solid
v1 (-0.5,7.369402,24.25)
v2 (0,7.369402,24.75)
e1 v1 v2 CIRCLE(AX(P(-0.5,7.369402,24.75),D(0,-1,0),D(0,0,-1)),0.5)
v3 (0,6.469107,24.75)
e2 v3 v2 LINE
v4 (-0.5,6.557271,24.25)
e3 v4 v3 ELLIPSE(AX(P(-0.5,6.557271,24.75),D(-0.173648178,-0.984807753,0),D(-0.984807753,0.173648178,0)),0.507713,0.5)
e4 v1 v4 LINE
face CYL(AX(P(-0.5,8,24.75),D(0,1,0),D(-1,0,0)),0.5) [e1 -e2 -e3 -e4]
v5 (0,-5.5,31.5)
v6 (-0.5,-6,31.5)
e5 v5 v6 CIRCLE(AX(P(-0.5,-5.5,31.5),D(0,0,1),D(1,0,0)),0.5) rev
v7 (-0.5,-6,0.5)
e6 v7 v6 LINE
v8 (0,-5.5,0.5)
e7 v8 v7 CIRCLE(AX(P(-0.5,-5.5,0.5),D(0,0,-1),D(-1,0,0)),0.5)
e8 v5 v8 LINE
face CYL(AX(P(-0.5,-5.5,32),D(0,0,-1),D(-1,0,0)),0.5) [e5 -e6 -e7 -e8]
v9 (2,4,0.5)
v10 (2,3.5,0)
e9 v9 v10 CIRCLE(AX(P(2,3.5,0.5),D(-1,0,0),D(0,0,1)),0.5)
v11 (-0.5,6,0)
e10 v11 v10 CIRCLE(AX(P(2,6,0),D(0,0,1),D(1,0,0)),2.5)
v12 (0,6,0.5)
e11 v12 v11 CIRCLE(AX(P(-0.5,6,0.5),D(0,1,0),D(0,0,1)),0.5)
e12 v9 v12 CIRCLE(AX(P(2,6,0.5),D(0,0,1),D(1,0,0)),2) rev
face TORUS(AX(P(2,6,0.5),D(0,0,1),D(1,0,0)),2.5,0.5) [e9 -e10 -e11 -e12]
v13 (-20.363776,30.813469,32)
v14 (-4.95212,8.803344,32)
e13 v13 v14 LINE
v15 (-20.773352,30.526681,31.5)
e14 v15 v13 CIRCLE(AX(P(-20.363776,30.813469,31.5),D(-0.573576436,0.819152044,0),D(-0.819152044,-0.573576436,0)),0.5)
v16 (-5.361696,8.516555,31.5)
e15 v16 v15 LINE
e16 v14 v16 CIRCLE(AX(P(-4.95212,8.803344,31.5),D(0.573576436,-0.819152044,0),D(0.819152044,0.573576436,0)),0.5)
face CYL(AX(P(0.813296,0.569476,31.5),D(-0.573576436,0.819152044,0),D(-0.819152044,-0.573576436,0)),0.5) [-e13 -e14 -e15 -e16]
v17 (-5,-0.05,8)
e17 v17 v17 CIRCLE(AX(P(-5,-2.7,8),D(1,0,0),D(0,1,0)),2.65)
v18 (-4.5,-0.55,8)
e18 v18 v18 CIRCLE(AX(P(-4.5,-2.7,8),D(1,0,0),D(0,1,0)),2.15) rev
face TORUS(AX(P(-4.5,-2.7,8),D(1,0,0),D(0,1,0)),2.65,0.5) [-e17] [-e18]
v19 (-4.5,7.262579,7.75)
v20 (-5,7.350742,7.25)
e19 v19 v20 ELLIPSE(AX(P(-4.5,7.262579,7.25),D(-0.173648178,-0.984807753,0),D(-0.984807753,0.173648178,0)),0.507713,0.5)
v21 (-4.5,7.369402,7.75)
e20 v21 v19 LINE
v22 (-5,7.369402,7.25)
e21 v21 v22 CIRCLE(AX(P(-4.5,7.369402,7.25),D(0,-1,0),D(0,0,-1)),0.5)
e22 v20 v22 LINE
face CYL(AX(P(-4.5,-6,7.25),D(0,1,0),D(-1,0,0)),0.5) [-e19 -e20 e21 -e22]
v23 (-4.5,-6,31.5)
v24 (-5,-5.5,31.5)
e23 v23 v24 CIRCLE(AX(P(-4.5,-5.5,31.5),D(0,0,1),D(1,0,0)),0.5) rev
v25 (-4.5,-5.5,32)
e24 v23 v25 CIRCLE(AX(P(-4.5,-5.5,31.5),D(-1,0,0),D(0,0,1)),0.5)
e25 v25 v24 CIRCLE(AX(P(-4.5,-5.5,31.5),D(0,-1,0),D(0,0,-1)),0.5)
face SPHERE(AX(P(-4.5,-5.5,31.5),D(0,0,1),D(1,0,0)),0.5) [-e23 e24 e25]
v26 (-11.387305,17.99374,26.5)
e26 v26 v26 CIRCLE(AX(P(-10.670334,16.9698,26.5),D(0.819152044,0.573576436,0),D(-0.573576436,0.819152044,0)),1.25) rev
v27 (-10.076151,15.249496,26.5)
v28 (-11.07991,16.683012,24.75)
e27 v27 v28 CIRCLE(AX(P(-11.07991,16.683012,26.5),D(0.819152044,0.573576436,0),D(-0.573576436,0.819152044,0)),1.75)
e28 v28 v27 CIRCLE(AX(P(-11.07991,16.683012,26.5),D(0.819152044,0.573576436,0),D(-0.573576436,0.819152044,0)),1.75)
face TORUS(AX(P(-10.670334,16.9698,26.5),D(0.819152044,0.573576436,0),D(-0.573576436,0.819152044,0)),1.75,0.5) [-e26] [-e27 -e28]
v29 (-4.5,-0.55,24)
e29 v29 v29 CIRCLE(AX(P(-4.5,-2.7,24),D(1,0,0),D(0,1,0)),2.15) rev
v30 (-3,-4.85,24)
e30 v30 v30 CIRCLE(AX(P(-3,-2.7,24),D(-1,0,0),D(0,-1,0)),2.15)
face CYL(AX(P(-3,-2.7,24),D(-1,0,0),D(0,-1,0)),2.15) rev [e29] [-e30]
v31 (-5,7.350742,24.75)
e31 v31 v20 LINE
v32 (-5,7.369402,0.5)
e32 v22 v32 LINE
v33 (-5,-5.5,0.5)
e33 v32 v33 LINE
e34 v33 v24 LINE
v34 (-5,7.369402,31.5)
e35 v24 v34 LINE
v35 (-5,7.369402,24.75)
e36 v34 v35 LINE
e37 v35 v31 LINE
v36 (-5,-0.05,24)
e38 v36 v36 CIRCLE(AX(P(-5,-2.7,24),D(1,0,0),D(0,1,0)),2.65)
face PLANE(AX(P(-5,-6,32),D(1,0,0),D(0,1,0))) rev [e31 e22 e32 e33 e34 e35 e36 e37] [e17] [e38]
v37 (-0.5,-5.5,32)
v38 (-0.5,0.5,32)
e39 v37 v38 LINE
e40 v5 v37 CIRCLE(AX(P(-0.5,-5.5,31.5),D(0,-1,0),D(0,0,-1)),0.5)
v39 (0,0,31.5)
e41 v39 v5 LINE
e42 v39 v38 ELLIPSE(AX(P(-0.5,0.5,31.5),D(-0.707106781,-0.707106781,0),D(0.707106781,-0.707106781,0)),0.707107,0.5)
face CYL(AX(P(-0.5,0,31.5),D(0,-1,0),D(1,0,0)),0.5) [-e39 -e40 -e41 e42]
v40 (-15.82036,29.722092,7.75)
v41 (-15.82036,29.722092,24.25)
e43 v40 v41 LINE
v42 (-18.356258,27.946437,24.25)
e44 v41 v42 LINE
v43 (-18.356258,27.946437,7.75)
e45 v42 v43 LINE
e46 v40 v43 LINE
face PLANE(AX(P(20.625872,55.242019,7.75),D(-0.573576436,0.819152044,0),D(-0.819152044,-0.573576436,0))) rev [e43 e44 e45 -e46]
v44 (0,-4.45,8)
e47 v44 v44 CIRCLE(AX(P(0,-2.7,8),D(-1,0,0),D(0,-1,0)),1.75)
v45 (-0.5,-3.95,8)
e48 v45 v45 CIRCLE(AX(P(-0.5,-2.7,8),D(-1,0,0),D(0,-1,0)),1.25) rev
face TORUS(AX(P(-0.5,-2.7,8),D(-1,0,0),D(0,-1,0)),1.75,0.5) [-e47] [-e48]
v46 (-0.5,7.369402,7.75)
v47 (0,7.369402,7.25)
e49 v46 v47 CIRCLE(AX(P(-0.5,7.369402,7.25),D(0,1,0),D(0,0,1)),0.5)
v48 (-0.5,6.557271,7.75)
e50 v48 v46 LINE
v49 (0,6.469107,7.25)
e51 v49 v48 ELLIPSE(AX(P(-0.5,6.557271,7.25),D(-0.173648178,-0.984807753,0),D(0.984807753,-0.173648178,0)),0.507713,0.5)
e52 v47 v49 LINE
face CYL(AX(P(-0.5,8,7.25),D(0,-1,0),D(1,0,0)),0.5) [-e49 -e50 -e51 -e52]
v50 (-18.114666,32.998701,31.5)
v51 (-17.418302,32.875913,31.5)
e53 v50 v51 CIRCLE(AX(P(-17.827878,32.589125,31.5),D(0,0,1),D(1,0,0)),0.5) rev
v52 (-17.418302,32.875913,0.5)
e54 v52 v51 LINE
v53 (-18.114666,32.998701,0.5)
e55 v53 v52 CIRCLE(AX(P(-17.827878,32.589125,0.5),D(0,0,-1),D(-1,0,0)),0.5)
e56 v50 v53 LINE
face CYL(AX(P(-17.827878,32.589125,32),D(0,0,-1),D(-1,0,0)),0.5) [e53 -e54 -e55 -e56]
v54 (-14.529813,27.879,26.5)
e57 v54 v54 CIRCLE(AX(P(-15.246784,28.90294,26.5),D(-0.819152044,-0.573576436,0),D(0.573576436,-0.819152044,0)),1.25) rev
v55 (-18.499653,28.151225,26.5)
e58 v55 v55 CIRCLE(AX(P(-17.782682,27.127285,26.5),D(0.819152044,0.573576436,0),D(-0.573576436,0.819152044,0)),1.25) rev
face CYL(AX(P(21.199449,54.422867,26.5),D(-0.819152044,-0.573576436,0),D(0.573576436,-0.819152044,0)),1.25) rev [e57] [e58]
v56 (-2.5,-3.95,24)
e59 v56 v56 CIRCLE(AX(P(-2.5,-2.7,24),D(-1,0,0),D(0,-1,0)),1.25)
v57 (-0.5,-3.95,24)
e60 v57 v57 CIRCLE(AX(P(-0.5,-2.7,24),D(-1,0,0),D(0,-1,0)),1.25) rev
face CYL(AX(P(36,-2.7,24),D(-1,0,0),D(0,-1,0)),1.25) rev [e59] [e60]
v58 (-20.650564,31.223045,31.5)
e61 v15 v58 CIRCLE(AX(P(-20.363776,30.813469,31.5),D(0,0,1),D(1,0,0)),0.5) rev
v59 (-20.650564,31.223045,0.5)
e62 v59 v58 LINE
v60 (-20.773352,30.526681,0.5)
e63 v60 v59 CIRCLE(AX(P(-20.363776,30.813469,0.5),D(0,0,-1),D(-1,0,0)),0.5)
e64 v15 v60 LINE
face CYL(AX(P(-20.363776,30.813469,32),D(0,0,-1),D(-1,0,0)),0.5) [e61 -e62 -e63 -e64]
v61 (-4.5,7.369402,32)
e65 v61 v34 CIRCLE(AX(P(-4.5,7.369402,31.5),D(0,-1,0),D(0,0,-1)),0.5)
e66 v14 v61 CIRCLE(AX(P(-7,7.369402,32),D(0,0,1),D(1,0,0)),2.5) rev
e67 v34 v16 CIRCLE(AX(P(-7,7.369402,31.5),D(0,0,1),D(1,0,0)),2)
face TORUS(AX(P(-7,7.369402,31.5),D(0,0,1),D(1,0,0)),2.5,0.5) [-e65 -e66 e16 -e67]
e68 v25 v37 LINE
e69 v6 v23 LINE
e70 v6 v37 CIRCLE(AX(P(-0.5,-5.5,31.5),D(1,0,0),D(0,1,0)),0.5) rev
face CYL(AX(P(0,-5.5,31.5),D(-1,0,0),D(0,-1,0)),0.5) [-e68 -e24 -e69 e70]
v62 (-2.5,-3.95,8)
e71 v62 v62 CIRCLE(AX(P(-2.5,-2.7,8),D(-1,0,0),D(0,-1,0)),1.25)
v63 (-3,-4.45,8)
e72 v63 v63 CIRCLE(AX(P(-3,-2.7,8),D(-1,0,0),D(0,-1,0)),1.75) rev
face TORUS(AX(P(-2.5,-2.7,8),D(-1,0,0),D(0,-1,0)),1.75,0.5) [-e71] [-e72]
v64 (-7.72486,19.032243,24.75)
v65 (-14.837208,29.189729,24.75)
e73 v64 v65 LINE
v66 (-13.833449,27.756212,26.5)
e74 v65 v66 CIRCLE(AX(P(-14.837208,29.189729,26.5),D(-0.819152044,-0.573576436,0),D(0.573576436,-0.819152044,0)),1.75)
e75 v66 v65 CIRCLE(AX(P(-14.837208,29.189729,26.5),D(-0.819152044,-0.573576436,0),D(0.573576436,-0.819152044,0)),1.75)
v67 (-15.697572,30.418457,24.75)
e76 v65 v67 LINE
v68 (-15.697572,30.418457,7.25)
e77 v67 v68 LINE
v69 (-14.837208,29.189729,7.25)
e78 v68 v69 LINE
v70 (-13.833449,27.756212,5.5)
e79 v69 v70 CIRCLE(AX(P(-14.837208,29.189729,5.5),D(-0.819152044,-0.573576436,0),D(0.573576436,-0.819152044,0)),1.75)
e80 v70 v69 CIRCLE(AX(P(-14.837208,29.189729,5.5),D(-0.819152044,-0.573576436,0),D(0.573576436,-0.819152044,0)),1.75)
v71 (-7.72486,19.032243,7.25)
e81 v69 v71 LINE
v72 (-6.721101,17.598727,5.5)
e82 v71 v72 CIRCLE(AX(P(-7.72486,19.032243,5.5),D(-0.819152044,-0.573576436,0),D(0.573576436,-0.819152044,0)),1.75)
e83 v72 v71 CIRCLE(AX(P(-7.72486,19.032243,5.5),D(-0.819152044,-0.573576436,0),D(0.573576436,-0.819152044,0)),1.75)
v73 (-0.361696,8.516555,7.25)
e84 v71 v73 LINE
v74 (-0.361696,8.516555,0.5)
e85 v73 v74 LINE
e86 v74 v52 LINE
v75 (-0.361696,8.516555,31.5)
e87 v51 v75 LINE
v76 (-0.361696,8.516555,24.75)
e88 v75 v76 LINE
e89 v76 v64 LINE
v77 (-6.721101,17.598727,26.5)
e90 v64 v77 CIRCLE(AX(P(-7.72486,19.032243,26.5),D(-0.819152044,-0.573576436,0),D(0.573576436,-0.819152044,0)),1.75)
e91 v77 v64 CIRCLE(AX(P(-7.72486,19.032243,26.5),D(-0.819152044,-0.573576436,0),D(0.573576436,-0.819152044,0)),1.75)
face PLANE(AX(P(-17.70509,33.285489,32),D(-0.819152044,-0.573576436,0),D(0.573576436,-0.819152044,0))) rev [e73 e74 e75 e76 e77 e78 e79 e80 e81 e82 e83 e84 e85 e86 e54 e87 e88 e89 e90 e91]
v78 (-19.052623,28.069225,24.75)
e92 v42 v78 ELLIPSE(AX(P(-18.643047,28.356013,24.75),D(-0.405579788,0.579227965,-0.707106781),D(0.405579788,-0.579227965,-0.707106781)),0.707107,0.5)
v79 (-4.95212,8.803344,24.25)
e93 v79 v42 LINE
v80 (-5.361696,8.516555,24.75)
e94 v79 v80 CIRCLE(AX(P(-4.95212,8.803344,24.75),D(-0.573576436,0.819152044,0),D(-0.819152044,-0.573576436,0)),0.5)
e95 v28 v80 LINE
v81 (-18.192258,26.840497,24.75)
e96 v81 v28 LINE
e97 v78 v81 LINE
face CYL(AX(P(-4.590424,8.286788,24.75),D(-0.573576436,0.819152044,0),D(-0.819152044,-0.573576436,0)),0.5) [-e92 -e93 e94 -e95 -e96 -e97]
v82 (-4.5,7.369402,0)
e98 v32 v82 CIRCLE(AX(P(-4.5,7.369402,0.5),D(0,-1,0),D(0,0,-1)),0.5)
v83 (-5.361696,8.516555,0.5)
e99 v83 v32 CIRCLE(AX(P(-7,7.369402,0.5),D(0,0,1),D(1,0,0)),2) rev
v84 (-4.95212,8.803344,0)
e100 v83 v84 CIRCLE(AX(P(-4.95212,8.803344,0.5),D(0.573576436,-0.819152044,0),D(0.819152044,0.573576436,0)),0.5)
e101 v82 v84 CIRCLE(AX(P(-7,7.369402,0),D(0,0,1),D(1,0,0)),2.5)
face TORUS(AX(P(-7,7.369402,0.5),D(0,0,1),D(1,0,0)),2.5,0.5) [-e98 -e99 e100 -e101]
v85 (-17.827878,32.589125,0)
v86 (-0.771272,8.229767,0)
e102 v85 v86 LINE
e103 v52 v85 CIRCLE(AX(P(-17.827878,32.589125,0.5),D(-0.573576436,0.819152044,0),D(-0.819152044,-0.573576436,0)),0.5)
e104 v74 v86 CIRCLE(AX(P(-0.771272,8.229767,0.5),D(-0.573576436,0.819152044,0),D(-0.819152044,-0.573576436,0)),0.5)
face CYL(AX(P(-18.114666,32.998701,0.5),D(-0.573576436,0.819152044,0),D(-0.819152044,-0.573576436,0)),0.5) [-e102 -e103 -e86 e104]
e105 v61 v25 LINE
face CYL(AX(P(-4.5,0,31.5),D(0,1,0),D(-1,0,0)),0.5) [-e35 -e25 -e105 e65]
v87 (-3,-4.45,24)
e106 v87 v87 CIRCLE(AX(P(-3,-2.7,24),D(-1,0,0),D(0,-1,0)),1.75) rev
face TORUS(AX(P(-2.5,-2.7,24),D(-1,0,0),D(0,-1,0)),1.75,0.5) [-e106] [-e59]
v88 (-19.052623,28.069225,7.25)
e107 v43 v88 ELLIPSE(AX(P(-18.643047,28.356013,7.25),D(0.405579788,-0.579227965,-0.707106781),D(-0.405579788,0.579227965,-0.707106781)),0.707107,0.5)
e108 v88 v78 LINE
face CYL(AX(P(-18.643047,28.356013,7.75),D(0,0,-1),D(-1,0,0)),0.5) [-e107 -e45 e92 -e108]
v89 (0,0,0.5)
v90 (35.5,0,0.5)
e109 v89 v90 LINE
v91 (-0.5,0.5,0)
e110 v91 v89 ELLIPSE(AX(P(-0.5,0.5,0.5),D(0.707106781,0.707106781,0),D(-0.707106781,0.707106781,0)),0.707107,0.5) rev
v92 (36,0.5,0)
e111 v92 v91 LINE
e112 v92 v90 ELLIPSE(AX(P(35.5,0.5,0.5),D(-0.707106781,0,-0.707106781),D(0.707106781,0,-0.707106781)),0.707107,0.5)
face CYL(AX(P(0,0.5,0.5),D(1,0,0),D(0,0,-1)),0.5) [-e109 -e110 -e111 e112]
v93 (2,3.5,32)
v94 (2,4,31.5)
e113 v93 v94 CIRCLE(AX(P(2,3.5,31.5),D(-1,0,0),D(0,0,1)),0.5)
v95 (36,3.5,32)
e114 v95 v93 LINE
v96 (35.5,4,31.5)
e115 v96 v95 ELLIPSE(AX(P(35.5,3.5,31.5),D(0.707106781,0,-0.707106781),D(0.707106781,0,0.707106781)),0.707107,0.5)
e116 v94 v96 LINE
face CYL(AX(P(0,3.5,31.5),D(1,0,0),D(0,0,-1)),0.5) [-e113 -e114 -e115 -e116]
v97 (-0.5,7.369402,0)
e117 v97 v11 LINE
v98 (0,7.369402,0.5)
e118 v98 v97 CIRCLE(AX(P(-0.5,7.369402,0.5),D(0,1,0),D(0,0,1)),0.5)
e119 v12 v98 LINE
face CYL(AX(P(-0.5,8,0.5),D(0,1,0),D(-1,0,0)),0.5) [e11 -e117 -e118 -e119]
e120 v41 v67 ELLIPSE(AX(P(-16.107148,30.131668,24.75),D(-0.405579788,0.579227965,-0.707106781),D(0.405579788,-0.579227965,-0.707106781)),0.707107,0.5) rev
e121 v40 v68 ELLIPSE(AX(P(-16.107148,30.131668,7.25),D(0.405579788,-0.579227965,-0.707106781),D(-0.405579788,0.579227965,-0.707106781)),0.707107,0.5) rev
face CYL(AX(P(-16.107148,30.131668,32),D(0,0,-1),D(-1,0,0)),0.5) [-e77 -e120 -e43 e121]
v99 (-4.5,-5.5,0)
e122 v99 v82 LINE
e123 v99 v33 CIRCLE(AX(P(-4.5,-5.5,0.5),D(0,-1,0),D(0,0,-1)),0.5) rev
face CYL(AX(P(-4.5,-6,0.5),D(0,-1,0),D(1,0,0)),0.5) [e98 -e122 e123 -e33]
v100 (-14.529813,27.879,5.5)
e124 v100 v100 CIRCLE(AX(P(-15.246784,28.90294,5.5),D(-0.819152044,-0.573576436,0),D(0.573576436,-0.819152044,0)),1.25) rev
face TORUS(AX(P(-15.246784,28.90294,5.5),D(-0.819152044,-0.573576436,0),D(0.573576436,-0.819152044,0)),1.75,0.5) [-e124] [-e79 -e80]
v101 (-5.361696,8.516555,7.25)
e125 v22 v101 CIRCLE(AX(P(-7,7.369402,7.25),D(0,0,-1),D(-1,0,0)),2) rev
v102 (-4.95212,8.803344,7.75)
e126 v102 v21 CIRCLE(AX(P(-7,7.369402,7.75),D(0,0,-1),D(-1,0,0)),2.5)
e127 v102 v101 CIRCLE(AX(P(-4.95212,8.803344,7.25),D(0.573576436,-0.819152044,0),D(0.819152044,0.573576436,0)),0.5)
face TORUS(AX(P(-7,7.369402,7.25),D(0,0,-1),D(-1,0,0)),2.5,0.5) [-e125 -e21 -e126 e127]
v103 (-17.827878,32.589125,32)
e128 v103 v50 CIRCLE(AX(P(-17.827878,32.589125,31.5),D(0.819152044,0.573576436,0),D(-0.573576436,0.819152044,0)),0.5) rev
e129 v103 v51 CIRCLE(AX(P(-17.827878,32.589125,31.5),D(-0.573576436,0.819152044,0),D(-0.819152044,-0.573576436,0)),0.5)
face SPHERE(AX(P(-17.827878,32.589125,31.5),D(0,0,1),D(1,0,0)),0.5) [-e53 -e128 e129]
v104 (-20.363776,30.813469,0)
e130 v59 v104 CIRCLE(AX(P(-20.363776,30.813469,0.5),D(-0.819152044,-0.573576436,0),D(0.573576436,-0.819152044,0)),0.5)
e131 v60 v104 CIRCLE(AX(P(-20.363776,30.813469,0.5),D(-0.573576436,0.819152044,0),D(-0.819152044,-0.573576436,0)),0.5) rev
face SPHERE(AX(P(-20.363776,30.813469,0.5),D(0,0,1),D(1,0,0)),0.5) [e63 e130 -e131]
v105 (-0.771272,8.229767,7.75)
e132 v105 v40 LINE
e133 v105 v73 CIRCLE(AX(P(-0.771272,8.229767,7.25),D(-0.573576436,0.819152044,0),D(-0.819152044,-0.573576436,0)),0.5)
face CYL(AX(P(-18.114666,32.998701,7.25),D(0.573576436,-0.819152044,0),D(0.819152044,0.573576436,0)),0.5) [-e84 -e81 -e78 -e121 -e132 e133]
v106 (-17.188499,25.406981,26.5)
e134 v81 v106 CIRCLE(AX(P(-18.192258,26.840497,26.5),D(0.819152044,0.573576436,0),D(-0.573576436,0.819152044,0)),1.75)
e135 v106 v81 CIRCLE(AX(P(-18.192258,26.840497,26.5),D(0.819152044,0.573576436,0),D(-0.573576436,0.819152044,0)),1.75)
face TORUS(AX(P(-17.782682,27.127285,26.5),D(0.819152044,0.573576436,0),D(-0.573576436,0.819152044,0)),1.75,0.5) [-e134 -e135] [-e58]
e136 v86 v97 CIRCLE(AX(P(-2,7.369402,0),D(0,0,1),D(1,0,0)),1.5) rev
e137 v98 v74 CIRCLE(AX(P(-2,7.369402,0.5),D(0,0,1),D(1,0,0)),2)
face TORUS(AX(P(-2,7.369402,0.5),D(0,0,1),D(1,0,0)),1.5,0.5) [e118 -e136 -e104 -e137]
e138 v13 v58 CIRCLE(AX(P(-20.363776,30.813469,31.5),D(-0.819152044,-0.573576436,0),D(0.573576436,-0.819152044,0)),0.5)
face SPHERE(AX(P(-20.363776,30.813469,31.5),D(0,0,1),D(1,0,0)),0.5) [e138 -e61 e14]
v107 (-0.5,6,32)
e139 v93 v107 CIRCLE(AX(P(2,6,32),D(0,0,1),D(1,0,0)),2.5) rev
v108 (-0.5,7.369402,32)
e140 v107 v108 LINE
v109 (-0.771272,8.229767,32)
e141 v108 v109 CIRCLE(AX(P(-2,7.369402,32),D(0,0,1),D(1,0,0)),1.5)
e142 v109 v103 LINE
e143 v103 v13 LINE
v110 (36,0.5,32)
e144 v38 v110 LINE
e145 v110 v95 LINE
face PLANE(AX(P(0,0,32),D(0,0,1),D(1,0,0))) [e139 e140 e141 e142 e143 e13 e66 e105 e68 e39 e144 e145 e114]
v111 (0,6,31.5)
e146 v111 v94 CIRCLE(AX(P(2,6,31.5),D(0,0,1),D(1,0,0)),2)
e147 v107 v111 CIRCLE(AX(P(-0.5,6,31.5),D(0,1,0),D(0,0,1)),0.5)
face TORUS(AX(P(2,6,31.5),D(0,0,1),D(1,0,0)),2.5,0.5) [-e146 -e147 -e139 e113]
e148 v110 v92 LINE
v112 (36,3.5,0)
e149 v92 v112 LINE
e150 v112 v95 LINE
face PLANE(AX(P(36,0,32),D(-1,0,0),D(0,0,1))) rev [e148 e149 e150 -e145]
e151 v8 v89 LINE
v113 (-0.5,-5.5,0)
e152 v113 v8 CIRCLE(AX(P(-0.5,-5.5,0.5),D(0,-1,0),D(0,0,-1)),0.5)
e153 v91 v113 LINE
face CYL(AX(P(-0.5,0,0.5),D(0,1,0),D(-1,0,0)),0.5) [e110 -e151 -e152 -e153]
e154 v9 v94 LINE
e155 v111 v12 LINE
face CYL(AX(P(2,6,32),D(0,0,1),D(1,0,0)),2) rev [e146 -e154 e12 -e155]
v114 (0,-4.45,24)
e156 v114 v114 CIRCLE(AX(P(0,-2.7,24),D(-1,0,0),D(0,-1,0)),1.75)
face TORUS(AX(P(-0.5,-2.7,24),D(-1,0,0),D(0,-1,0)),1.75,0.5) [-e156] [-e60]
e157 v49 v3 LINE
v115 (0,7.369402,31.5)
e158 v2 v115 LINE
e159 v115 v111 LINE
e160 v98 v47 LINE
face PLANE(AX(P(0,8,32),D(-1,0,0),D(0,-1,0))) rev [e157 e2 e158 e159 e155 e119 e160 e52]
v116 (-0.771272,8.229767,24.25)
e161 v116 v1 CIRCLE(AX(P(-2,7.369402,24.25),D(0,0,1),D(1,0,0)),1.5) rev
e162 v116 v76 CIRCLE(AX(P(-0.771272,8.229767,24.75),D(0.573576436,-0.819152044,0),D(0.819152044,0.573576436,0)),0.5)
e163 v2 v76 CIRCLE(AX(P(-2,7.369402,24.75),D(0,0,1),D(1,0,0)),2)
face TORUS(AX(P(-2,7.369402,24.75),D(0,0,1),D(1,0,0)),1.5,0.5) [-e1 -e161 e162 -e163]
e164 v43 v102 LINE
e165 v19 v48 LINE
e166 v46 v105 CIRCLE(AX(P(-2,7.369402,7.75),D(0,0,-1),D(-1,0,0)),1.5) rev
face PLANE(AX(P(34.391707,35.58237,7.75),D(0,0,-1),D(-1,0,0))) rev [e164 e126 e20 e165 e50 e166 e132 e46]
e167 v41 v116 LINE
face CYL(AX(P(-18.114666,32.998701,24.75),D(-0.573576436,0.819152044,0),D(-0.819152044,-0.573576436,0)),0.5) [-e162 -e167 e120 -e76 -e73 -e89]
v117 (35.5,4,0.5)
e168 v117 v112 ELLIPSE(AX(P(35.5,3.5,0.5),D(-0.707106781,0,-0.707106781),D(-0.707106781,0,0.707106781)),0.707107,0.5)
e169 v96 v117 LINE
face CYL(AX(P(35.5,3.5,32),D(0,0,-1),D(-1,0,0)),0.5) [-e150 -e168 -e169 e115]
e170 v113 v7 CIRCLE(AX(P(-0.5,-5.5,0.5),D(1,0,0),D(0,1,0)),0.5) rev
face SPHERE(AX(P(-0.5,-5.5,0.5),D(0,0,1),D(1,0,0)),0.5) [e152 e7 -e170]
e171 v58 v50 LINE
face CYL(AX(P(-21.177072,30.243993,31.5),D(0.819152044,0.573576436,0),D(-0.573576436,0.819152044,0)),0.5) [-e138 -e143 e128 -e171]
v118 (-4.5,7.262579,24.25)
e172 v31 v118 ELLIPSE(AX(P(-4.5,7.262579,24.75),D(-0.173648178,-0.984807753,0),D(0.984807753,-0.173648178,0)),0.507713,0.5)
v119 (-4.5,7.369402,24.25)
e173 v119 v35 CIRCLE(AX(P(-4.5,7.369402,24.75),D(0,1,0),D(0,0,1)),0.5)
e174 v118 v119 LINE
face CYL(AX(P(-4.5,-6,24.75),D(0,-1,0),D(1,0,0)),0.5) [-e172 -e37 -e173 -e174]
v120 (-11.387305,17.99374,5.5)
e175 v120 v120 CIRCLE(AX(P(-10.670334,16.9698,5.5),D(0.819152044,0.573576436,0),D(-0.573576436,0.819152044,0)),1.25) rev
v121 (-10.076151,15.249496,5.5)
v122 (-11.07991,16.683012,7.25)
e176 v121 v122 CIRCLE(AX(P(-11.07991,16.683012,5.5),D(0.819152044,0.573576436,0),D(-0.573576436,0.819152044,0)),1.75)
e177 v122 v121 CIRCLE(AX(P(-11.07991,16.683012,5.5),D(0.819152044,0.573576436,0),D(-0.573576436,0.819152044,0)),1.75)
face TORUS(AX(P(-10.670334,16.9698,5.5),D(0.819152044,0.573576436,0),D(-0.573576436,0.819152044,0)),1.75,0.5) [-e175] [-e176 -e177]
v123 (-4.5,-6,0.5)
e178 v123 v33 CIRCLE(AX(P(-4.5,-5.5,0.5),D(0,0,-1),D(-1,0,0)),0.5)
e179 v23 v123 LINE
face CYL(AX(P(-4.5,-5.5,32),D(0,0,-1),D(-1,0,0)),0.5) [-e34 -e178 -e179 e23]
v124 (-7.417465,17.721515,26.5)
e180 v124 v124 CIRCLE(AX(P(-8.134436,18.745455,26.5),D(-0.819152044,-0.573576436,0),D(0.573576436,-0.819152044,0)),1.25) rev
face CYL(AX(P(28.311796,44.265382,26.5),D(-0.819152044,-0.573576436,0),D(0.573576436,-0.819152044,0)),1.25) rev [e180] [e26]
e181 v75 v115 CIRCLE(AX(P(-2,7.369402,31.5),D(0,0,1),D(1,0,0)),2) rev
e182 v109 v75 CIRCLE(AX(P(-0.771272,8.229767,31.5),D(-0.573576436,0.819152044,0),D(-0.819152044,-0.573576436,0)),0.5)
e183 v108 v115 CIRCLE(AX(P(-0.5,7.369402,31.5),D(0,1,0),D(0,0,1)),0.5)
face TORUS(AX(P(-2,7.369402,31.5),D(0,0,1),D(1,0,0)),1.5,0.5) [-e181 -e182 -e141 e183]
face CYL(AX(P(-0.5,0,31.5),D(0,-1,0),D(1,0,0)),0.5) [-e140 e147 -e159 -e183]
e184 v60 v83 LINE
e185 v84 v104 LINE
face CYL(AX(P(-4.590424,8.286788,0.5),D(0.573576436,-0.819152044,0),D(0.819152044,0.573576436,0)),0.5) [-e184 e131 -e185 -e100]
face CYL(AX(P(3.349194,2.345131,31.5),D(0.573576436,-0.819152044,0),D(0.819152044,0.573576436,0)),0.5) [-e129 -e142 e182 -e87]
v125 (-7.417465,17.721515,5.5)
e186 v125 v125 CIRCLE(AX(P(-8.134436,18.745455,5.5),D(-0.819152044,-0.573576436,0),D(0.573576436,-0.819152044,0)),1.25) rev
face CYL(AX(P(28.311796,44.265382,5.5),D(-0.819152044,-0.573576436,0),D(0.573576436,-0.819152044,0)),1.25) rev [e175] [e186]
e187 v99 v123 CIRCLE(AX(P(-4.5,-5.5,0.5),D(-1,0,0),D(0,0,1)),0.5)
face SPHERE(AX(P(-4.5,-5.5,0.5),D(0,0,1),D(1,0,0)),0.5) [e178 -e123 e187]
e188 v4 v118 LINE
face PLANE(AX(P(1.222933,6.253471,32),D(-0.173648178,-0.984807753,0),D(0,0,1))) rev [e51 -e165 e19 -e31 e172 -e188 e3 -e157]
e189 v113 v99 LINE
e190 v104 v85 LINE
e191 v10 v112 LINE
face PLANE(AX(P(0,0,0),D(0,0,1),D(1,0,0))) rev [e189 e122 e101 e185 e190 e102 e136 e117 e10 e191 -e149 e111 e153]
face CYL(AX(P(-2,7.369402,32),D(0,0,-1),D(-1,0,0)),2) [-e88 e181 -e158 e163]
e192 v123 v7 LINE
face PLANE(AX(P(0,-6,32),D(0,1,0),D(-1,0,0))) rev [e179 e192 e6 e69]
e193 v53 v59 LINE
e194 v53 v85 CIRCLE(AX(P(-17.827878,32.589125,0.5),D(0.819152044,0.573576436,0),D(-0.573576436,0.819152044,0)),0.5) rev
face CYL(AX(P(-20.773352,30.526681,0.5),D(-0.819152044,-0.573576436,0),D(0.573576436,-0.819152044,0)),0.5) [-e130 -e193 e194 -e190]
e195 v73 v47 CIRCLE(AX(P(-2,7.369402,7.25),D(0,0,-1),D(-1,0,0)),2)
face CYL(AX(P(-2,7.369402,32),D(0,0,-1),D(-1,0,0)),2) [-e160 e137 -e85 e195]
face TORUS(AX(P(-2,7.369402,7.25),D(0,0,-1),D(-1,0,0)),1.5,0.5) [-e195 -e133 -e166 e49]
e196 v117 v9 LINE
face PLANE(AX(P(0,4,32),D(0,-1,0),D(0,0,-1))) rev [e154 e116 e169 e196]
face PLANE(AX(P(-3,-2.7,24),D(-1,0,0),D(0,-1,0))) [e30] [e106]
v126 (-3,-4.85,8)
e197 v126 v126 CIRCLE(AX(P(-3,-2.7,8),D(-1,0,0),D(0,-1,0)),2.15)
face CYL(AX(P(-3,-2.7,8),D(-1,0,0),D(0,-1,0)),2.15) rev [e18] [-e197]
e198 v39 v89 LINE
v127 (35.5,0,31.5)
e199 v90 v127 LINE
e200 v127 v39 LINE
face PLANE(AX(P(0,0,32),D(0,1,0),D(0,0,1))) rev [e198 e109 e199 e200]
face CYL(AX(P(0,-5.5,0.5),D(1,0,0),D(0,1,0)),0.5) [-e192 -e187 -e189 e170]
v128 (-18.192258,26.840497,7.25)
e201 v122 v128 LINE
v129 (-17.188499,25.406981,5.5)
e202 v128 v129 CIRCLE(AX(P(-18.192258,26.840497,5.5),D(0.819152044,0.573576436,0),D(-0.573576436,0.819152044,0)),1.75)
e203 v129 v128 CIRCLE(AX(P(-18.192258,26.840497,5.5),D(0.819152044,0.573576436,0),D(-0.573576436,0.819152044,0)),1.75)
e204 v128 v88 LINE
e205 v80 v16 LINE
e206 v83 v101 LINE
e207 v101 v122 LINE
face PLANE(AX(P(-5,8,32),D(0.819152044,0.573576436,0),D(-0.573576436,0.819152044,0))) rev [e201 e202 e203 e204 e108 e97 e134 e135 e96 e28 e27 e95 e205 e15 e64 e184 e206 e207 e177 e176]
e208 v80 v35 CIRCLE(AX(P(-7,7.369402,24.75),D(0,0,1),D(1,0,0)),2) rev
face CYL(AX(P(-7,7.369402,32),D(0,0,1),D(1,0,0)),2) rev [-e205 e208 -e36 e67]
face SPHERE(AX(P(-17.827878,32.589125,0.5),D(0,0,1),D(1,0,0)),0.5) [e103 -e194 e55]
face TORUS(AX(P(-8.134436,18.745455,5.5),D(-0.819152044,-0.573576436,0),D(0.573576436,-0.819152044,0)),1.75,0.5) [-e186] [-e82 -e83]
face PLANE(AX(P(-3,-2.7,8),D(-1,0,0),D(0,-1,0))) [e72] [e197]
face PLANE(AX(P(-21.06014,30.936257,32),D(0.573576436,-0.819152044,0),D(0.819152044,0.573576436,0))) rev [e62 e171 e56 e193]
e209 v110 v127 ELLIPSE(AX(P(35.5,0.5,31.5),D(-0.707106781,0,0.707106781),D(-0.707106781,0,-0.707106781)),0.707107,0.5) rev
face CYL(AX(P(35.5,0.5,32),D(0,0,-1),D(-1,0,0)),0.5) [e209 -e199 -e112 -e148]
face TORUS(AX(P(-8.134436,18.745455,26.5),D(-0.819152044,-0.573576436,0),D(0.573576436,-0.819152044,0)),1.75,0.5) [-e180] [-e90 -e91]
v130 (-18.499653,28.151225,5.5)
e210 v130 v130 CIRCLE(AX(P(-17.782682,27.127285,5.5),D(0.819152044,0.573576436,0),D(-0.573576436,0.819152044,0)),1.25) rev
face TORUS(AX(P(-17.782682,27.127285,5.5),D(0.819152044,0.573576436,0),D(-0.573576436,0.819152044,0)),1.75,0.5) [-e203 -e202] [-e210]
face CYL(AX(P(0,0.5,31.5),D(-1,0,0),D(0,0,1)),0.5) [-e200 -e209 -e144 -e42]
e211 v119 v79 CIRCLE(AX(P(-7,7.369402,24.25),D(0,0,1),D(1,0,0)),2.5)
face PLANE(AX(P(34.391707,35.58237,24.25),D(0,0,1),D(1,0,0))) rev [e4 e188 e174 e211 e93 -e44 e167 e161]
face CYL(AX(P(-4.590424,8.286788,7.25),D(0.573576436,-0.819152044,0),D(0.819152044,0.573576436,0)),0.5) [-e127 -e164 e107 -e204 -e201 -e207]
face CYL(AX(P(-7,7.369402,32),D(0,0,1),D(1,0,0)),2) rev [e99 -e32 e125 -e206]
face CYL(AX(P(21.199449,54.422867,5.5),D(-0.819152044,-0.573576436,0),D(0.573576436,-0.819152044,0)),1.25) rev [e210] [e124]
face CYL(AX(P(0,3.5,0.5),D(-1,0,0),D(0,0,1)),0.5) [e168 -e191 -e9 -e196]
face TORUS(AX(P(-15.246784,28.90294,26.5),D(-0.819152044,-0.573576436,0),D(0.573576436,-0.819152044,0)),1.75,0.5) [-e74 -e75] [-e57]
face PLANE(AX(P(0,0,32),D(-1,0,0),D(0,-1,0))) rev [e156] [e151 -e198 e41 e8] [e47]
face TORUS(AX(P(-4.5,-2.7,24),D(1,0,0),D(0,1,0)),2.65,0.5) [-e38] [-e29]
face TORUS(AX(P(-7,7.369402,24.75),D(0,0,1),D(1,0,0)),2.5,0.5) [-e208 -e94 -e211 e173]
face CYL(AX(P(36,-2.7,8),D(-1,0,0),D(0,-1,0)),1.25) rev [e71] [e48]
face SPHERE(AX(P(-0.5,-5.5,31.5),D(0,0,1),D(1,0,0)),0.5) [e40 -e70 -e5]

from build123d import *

# Parameters (mm, degrees)
BOSS_EXTRU_1_DEPTH      = 32
ESQUISSE2_R             = 1.25
ENL_V_MAT_EXTRU_1_DEPTH = 62.748876622
ESQUISSE3_R             = 1.25
ESQUISSE3_W             = 16.5
ESQUISSE3_H             = 24
ENL_V_MAT_EXTRU_2_DEPTH = 59.140175519
ESQUISSE4_R             = 2.15
ENL_V_MAT_EXTRU_3_DEPTH = 2
CHANFREIN1_SIZE         = 5
CONG_1_R                = 2
CONG_2_R                = 0.5


# Some blends are built 0.0001 mm under size
with BuildPart() as part:
    # Esquisse1 → Boss.-Extru.1 (new body)
    with BuildSketch(Plane.XY):
        Polygon((0, 0), (0, -6), (-5, -6), (-5, 8), (-21.060140218, 30.93625724), (-17.70508986, 33.285488792), (0, 8), (0, 4), (36, 4), (36, 0), align=None)
    extrude(amount=BOSS_EXTRU_1_DEPTH)

    # Esquisse2 → Enlèv. mat.-Extru.1 (cut, through all)
    with BuildSketch(Plane.ZY.offset(5)):
        with Locations(Location((8, -2.7, 0), (0, 0, 270))):
            Circle(ESQUISSE2_R)
        with Locations(Location((24, -2.7, 0), (0, 0, 270))):
            Circle(ESQUISSE2_R)
    extrude(amount=-ENL_V_MAT_EXTRU_1_DEPTH, mode=Mode.SUBTRACT)

    # Esquisse3 → Enlèv. mat.-Extru.2 (cut, through all)
    with BuildSketch(Plane(origin=(0.403720125, 0.282687875, 0), x_dir=(0, 0, 1), z_dir=(-0.819152044288991, -0.5735764363510472, 0))):
        with Locations(Location((5.5, 32.421098536, 0), (0, 0, 270))):
            Circle(ESQUISSE3_R)
        with Locations(Location((5.5, 20.021098536, 0), (0, 0, 270))):
            Circle(ESQUISSE3_R)
        with Locations(Location((26.5, 32.421098536, 0), (0, 0, 270))):
            Circle(ESQUISSE3_R)
        with Locations(Location((26.5, 20.021098536, 0), (0, 0, 270))):
            Circle(ESQUISSE3_R)
        with Locations((16, 21.421098536)):
            Rectangle(ESQUISSE3_W, ESQUISSE3_H)
    extrude(amount=-ENL_V_MAT_EXTRU_2_DEPTH, mode=Mode.SUBTRACT)

    # Esquisse4 → Enlèv. mat.-Extru.3 (cut)
    with BuildSketch(Plane.ZY.offset(5)):
        with Locations(Location((8, -2.7, 0), (0, 0, 270))):
            Circle(ESQUISSE4_R)
        with Locations(Location((24, -2.7, 0), (0, 0, 270))):
            Circle(ESQUISSE4_R)
    extrude(amount=-ENL_V_MAT_EXTRU_3_DEPTH, mode=Mode.SUBTRACT)

    # Chanfrein1
    # the kernel refuses this chamfer: 5 mm, written as the material it takes off along each edge
    with BuildSketch(Plane(origin=(-1.644949642, 10.349231552, 24.25), x_dir=(0.595882880335464, -0.8030713498333203, 0), z_dir=(0, 0, -1))) as chanfrein1_piece_1:
        Polygon((CHANFREIN1_SIZE * 0.999621916911, CHANFREIN1_SIZE * 0.0274958766106), (-CHANFREIN1_SIZE * 0.0274958766106, CHANFREIN1_SIZE * 0.999621916911), (0, 0), align=None)
    extrude(amount=16.5, mode=Mode.SUBTRACT)

    # Congé1
    cong_1_edges = [part.edges().sort_by_distance(p)[0] for p in [
        (0, 8, 3.875),
        (-5, 8, 28.125),
        (0, 8, 28.125),
        (0, 4, 16),
        (-5, 8, 3.875),
    ]]
    fillet(cong_1_edges, radius=CONG_1_R)

    # Congé2
    cong_2_edges = [part.edges().sort_by_distance(p)[0] for p in [
        (19, 4, 32),
        (0, 6.919254878, 24.25),
        (-13.210918065, 19.726406268, 0),
        (-19.382615039, 32.110873016, 0),
        (19, 4, 0),
        (18, 0, 0),
        (-5, 7.360072329, 24.25),
        (-5, 0.684701211, 0),
        (-5, 0.684701211, 32),
        (-12.063765192, 18.088102179, 24.25),
        (-7.886240013, 19.262717955, 24.25),
        (-9.033392885, 20.901022044, 0),
        (-9.033392885, 20.901022044, 32),
        (0, 6.684701211, 0),
        (-0.092566099, 7.970814021, 0),
        (0, 6.684701211, 32),
        (0, 6.919254878, 7.75),
        (-0.092566099, 7.970814021, 7.75),
        (-0.092566099, 7.970814021, 24.25),
        (-0.092566099, 7.970814021, 32),
        (-5.092566099, 7.970814021, 24.25),
        (-5.092566099, 7.970814021, 32),
        (-5.092566099, 7.970814021, 0),
        (-5.092566099, 7.970814021, 7.75),
        (0.585786438, 4.585786438, 0),
        (0.585786438, 4.585786438, 32),
        (0, -6, 16),
        (-5, -6, 16),
        (-21.060140218, 30.93625724, 16),
        (-17.70508986, 33.285488792, 16),
        (36, 4, 16),
        (36, 0, 16),
        (-19.382615039, 32.110873016, 32),
        (-13.210918065, 19.726406268, 32),
        (-2.5, -6, 32),
        (0, -3, 32),
        (0, -1.45, 8),
        (0, -1.45, 24),
        (18, 0, 32),
        (-15.554178223, 30.213668626, 26.5),
        (-18.909228582, 27.864437074, 26.5),
        (-8.441830412, 20.056183277, 26.5),
        (-11.796880771, 17.706951725, 26.5),
        (-15.554178223, 30.213668626, 5.5),
        (-18.909228582, 27.864437074, 5.5),
        (-8.441830412, 20.056183277, 5.5),
        (-11.796880771, 17.706951725, 5.5),
        (-7.886240013, 19.262717955, 7.75),
        (-15.410784114, 30.008880615, 16),
        (-12.063765192, 18.088102179, 7.75),
        (-18.765834472, 27.659649063, 16),
        (-5, -0.55, 8),
        (-3, -1.45, 8),
        (-5, -0.55, 24),
        (-3, -1.45, 24),
        (0, -3, 0),
        (-2.5, -6, 0),
        (-5, 7.360072329, 7.75),
    ]]
    fillet(cong_2_edges, radius=CONG_2_R - 0.0001)  # a hair under: the kernel refuses the full size


solid = part.part
